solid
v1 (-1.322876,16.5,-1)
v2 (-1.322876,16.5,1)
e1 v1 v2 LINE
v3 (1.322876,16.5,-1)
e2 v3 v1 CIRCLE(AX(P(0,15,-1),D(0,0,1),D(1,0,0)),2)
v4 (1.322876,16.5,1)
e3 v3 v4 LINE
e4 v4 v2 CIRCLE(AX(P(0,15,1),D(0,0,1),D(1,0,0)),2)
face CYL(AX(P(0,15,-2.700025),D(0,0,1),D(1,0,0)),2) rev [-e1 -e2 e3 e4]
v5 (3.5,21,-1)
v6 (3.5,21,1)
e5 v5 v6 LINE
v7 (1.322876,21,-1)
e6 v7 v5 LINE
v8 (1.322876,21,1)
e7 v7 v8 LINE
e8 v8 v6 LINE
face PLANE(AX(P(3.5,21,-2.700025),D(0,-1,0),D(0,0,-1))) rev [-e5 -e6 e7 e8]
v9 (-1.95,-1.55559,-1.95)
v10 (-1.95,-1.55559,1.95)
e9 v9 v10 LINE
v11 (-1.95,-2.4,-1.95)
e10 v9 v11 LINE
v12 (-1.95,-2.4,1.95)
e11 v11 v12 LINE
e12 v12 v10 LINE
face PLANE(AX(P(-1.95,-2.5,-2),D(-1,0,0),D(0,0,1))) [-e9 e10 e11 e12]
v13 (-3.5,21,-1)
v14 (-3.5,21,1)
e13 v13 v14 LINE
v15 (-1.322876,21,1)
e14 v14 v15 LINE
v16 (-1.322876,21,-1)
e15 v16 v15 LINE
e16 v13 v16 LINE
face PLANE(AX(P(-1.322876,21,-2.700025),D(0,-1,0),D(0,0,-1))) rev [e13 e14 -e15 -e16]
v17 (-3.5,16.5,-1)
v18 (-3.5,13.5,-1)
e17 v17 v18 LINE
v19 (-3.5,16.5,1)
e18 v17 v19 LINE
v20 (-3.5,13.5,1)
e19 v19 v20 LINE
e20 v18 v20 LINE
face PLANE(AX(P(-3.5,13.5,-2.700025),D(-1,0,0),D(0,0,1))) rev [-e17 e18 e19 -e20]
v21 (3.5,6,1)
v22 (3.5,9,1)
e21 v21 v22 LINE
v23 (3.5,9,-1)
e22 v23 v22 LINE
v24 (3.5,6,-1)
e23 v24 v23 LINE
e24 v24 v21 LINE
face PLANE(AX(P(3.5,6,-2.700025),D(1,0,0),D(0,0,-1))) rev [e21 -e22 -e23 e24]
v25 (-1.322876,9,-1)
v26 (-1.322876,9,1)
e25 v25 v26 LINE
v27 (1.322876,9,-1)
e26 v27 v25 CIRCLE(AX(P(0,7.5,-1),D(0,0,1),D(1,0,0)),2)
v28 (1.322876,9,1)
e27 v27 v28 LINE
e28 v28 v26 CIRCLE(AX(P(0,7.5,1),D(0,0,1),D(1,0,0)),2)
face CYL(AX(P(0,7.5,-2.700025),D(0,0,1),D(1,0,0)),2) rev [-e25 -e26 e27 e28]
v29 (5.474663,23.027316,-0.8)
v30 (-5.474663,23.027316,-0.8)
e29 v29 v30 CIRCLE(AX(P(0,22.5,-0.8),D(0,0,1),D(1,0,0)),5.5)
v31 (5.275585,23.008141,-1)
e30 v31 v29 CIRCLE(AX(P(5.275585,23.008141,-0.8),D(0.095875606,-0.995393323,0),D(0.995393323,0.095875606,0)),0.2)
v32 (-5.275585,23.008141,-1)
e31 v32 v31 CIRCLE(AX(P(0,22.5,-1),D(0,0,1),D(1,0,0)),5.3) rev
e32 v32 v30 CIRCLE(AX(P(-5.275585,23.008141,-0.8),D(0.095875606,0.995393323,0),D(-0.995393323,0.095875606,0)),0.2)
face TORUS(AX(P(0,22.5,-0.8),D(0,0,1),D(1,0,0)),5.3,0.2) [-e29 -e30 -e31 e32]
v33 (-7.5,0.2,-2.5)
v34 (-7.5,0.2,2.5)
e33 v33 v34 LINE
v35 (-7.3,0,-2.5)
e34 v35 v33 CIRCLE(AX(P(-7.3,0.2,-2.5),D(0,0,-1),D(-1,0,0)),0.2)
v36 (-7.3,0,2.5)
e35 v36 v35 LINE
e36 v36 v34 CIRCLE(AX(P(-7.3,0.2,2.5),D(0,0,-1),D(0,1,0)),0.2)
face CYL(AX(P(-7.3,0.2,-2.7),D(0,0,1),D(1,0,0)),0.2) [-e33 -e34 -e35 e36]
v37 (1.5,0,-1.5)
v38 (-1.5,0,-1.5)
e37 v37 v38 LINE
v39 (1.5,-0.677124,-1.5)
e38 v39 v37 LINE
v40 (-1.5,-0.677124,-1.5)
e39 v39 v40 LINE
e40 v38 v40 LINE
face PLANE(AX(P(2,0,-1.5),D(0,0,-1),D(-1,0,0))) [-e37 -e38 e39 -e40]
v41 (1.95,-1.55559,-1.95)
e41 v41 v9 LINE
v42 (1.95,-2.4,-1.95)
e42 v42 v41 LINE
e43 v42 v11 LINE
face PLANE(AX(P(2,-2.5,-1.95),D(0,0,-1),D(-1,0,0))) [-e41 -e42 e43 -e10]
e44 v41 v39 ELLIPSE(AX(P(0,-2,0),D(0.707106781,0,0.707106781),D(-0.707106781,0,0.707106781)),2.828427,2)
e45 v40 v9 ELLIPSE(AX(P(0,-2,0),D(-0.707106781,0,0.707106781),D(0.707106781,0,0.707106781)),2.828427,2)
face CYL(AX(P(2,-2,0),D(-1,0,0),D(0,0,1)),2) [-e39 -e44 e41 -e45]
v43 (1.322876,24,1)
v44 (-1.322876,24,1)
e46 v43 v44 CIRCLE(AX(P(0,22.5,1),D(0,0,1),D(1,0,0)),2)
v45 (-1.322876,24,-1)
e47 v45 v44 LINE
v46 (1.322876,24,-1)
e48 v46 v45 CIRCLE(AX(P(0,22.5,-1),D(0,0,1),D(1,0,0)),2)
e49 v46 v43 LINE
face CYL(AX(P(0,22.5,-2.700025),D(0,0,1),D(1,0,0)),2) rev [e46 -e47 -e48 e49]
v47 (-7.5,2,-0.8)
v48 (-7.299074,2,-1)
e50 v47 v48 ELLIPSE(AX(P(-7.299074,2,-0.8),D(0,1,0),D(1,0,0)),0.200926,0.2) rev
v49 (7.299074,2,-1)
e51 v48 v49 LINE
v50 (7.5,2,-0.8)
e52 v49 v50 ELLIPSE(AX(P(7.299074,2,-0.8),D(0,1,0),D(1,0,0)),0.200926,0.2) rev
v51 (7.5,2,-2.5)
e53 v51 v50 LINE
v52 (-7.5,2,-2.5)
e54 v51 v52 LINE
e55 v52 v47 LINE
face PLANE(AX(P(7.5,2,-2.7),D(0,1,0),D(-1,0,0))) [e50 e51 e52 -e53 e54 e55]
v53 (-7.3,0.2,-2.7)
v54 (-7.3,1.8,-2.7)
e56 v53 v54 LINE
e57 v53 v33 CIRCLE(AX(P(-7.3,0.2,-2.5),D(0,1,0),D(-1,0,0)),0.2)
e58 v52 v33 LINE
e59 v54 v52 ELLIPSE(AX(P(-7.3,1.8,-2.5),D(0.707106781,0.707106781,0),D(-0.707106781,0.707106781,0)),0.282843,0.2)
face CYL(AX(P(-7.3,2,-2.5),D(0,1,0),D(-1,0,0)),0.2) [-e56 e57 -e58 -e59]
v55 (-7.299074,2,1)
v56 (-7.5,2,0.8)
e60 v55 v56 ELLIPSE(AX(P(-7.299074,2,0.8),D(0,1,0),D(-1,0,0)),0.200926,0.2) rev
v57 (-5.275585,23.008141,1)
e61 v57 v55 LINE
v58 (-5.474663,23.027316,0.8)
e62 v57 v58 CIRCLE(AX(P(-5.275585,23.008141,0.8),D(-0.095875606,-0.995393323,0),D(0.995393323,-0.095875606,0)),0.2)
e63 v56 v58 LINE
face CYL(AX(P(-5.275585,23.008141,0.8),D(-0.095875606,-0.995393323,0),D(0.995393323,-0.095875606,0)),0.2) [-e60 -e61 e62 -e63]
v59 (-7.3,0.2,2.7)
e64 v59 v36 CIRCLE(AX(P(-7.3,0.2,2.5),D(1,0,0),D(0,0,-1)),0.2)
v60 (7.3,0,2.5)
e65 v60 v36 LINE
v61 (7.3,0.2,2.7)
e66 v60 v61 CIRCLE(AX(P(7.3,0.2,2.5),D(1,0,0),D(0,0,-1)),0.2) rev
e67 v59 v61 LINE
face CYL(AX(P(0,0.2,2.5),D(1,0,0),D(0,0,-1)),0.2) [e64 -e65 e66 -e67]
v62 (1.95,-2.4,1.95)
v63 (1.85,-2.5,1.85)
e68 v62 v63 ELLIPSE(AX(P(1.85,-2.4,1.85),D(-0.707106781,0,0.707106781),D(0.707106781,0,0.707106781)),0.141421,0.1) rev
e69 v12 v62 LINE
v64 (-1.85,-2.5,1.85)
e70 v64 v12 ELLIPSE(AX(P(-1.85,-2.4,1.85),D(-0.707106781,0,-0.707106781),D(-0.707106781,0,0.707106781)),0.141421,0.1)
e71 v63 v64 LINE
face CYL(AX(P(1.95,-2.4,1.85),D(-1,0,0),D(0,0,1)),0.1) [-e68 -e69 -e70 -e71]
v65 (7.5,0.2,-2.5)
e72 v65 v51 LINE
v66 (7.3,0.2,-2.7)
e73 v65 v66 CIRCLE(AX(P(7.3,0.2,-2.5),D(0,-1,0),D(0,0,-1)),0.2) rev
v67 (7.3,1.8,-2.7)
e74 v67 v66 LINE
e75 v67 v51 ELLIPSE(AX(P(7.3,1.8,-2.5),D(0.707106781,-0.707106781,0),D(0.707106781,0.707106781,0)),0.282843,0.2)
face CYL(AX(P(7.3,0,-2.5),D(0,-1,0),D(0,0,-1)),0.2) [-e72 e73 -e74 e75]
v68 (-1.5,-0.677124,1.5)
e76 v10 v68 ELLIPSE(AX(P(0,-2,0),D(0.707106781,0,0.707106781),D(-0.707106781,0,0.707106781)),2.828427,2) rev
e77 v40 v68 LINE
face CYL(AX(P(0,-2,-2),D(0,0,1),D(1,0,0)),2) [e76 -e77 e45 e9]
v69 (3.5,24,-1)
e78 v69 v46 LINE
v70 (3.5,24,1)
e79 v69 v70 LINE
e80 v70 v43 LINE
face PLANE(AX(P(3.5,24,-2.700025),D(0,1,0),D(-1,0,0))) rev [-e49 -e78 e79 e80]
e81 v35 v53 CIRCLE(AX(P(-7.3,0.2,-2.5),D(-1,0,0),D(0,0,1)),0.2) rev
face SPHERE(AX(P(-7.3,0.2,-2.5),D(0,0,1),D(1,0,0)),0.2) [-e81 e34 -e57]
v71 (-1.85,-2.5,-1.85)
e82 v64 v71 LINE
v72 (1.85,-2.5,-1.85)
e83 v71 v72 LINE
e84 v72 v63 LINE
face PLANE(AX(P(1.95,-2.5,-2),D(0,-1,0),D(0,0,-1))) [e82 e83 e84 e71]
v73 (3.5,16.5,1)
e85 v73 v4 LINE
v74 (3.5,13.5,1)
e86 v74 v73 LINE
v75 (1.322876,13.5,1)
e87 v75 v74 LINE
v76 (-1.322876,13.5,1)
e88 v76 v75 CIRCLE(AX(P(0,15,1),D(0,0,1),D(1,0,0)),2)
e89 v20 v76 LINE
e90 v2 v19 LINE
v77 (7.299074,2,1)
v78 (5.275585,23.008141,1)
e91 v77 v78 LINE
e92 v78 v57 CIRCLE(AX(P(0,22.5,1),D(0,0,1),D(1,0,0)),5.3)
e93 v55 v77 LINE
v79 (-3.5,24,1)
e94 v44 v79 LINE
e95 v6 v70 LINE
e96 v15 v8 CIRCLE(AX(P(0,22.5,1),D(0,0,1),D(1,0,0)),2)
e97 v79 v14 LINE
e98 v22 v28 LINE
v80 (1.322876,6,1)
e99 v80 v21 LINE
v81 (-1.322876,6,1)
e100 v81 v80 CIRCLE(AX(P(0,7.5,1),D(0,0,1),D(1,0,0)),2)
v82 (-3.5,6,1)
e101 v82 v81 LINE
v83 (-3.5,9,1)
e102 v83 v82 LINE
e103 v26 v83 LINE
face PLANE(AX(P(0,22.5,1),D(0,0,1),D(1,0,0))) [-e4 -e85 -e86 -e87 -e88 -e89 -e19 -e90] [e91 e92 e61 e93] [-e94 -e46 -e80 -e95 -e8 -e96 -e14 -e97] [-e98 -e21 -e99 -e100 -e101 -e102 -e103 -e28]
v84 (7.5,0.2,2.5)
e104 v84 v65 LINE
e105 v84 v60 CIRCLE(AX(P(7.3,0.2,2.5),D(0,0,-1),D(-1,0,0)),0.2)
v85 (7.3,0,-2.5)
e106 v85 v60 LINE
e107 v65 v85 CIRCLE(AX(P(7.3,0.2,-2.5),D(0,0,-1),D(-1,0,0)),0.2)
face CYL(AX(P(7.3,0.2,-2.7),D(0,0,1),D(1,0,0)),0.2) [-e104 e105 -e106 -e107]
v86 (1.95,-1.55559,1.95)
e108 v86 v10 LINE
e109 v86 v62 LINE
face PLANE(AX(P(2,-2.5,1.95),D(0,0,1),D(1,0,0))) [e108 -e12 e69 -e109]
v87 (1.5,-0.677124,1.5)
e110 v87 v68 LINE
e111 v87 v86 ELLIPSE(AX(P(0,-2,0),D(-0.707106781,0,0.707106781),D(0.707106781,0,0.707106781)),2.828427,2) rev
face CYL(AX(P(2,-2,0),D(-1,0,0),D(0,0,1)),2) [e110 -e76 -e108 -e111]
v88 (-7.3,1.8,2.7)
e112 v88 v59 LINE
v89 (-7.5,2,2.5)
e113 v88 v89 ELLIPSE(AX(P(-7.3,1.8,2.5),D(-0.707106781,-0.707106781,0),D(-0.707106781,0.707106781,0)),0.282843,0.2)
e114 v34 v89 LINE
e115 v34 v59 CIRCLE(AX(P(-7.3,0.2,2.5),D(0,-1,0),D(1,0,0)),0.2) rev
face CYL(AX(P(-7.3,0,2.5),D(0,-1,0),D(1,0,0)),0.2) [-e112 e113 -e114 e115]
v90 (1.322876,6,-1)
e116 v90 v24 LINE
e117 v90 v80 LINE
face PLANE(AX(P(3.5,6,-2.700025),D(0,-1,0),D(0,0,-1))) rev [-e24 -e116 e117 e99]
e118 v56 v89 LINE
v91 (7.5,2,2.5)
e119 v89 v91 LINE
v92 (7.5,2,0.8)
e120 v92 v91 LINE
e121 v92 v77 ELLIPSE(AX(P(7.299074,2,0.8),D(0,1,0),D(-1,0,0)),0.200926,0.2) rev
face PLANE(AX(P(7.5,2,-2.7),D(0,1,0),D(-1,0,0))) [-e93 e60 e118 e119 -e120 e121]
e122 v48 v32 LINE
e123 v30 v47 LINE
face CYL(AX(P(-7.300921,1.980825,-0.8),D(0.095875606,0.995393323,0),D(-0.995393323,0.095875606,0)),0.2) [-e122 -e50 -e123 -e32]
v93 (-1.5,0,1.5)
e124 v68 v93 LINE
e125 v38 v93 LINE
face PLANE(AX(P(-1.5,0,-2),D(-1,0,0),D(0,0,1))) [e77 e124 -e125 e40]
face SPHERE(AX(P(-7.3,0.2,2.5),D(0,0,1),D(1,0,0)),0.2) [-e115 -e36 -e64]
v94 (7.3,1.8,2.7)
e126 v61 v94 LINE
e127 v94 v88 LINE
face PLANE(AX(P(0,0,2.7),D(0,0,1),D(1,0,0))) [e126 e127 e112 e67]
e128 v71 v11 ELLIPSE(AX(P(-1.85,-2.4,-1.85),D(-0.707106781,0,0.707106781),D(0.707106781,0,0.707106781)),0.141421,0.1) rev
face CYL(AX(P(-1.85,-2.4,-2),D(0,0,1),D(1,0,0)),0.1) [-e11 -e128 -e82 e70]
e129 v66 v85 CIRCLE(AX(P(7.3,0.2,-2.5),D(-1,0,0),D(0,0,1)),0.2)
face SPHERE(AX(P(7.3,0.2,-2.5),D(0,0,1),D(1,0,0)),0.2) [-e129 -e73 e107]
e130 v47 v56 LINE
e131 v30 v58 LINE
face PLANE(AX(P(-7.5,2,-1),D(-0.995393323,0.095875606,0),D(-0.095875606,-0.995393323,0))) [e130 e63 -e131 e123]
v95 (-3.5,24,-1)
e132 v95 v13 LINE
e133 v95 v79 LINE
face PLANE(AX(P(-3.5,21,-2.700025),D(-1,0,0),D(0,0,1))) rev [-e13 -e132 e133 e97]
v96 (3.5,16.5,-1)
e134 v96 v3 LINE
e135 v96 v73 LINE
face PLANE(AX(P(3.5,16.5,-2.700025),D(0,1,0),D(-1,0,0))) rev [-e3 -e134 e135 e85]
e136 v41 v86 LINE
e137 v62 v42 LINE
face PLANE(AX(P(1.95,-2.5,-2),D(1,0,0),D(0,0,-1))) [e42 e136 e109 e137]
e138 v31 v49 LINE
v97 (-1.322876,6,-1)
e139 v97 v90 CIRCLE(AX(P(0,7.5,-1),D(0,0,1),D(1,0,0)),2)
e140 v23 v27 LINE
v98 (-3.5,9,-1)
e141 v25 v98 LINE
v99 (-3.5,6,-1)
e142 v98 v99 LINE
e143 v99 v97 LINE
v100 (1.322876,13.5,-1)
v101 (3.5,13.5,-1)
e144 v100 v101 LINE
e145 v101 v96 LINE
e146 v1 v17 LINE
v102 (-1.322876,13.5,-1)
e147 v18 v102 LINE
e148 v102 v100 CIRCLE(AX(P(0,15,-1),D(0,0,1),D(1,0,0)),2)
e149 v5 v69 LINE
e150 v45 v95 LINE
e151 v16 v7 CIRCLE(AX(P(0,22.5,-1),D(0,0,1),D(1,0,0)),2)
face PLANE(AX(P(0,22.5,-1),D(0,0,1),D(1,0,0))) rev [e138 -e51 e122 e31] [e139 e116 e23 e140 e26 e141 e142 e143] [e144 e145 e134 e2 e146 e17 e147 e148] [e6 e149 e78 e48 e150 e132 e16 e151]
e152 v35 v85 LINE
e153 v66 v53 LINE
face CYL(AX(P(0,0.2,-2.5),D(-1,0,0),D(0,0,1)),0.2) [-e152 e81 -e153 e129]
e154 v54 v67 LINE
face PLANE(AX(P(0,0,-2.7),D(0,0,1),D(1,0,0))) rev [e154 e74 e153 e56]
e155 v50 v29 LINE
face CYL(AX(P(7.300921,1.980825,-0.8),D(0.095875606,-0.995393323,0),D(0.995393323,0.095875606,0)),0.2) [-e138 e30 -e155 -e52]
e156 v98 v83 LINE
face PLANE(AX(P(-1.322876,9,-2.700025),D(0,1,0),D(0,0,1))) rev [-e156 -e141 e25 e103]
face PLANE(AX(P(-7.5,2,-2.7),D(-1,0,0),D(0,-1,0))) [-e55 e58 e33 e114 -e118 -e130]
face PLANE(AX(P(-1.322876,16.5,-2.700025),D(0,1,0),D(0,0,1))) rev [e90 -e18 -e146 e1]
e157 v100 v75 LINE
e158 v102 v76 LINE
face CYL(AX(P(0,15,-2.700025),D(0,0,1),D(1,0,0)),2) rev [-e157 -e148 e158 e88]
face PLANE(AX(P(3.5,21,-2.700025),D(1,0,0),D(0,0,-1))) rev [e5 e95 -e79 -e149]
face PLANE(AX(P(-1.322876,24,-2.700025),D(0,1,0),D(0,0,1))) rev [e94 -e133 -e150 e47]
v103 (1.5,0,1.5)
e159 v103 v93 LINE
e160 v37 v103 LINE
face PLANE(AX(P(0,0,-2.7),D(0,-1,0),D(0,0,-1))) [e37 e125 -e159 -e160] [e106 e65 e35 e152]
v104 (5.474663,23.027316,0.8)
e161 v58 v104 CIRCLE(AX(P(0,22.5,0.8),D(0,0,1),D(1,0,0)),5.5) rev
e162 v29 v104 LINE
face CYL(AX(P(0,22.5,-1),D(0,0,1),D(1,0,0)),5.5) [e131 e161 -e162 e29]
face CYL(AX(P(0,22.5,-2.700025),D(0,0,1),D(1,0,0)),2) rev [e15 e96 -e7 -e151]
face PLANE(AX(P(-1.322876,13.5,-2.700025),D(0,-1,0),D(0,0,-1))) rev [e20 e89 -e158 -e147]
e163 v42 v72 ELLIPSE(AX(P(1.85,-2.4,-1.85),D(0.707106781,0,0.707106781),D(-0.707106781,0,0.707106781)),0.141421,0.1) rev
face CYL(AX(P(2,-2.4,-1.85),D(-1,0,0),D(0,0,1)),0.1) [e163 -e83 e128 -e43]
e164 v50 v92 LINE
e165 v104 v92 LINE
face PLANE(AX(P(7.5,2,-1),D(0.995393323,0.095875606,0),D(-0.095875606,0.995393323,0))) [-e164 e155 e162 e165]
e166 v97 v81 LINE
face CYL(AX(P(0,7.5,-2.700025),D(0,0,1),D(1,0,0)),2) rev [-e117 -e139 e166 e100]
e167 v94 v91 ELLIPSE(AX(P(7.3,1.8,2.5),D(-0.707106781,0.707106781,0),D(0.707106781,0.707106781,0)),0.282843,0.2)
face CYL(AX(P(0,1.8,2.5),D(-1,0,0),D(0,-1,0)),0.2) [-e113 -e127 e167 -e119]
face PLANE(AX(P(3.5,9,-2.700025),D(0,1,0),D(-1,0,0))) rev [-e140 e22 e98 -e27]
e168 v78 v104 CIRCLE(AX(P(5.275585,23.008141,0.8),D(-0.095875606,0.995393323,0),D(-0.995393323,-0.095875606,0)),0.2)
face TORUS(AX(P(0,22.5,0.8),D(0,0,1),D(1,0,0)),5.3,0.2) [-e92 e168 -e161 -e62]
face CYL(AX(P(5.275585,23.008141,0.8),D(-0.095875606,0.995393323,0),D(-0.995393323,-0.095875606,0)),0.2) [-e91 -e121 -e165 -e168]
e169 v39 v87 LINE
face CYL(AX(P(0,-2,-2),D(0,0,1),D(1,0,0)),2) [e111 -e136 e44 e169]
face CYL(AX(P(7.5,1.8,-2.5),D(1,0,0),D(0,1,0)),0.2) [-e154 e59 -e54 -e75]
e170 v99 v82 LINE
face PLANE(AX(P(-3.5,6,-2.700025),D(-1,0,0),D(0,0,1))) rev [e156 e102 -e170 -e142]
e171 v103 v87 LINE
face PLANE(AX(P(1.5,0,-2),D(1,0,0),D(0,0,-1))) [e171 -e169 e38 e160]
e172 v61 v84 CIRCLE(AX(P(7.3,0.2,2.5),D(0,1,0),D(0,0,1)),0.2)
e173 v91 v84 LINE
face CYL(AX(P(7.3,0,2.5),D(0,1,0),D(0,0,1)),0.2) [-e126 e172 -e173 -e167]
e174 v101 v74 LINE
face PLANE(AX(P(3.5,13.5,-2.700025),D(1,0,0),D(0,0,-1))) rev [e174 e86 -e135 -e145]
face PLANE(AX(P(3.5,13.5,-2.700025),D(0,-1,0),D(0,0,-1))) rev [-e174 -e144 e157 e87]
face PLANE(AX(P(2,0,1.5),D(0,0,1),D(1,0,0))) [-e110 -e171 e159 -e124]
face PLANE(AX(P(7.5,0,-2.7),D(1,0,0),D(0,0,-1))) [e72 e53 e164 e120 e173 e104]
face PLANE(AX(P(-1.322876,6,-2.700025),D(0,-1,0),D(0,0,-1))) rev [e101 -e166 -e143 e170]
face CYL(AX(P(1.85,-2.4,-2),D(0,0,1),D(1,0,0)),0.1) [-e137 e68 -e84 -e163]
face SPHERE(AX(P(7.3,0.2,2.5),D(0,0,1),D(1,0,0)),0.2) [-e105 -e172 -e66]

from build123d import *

# Parameters (mm, degrees)
EXTRUDE_1_DEPTH          = 2.7
EXTRUDE_1_DEPTH_BACK     = 2.7
EXTRUDE_2_DEPTH          = 1
EXTRUDE_2_DEPTH_BACK     = 1
CUT_EXTRUDE_1_DEPTH      = 30.222251796
PATTERN_LINEAR_1_COUNT   = 3
PATTERN_LINEAR_1_PITCH   = 7.5
EXTRUDE_3_DEPTH          = 2
EXTRUDE_3_DEPTH_BACK     = 2
CUT_EXTRUDE_2_DEPTH      = 2
CUT_EXTRUDE_2_DEPTH_BACK = 2
FILLET_1_R               = 0.1
FILLET_4_R               = 0.2
FILLET_5_R               = 0.2
FILLET_8_R               = 0.2


with BuildPart() as part:
    # 草图1 → 凸台-拉伸1 (new, two sides: drawn at the far end of the back side and taken through both)
    with BuildSketch(Plane.XY.offset(-EXTRUDE_1_DEPTH_BACK)):
        Polygon((0, 0), (7.5, 0), (7.5, 2), (-7.5, 2), (-7.5, 0), align=None)
    extrude(amount=EXTRUDE_1_DEPTH + EXTRUDE_1_DEPTH_BACK)

    # 草图2 → 凸台-拉伸2 (add, two sides: drawn at the far end of the back side and taken through both)
    with BuildSketch(Plane.XY.offset(-EXTRUDE_2_DEPTH_BACK)):
        with BuildLine():
            Line((-7.5, 2), (-5.474663278, 23.027315834))
            ThreePointArc((-5.474663278, 23.027315834), (0, 28), (5.474663278, 23.027315834))
            Line((5.474663278, 23.027315834), (7.5, 2))
            Line((7.5, 2), (-7.5, 2))
        make_face()
    extrude(amount=EXTRUDE_2_DEPTH + EXTRUDE_2_DEPTH_BACK)

    # 草图3 → 切除-拉伸1 (cut, through all)
    with BuildSketch(Plane.XY.offset(1)):
        with BuildLine():
            Line((3.5, 6), (3.5, 9))
            Line((3.5, 9), (1.322875656, 9))
            ThreePointArc((1.322875656, 9), (0, 9.5), (-1.322875656, 9))
            Line((-1.322875656, 9), (-3.5, 9))
            Line((-3.5, 9), (-3.5, 6))
            Line((-3.5, 6), (-1.322875656, 6))
            ThreePointArc((-1.322875656, 6), (0, 5.5), (1.322875656, 6))
            Line((1.322875656, 6), (3.5, 6))
        make_face()
    cut_extrude_1 = extrude(amount=-CUT_EXTRUDE_1_DEPTH, mode=Mode.SUBTRACT)

    # 阵列(线性)1: 切除-拉伸1 ×3
    with Locations(*[(0, i * PATTERN_LINEAR_1_PITCH, 0) for i in range(1, PATTERN_LINEAR_1_COUNT)]):
        add(cut_extrude_1, mode=Mode.SUBTRACT)

    # 草图4 → 凸台-拉伸3 (add, two sides: drawn at the far end of the back side and taken through both)
    with BuildSketch(Plane.XY.offset(-EXTRUDE_3_DEPTH_BACK)):
        with BuildLine():
            Line((1.5, 0), (-1.5, 0))
            Line((-1.5, 0), (-1.5, -0.677124344))
            ThreePointArc((-1.5, -0.677124344), (-1.780042303, -1.088161527), (-1.95, -1.555590279))
            Line((-1.95, -1.555590279), (-1.95, -2.5))
            Line((-1.95, -2.5), (1.95, -2.5))
            Line((1.95, -2.5), (1.95, -1.555590279))
            ThreePointArc((1.95, -1.555590279), (1.780042303, -1.088161527), (1.5, -0.677124344))
            Line((1.5, -0.677124344), (1.5, 0))
        make_face()
    extrude(amount=EXTRUDE_3_DEPTH + EXTRUDE_3_DEPTH_BACK)

    # 草图5 → 切除-拉伸2 (cut, two sides: drawn at the far end of the back side and taken through both)
    with BuildSketch(Plane(origin=(0, 0, 0), x_dir=(0, 0, -1), z_dir=(1, 0, 0)).offset(-CUT_EXTRUDE_2_DEPTH_BACK)):
        with BuildLine():
            Line((1.5, 0), (1.5, -0.677124344))
            ThreePointArc((1.5, -0.677124344), (1.780042303, -1.088161527), (1.95, -1.555590279))
            Line((1.95, -1.555590279), (1.95, -2.5))
            Line((1.95, -2.5), (2, -2.5))
            Line((2, -2.5), (2, 0))
            Line((2, 0), (1.5, 0))
        make_face()
        with BuildLine():
            Line((-2, 0), (-1.5, 0))
            Line((-1.5, 0), (-1.5, -0.677124344))
            ThreePointArc((-1.5, -0.677124344), (-1.780042303, -1.088161527), (-1.95, -1.555590279))
            Line((-1.95, -1.555590279), (-1.95, -2.5))
            Line((-1.95, -2.5), (-2, -2.5))
            Line((-2, -2.5), (-2, 0))
        make_face()
    extrude(amount=CUT_EXTRUDE_2_DEPTH + CUT_EXTRUDE_2_DEPTH_BACK, mode=Mode.SUBTRACT)

    # 圆角1
    fillet_1_edges = [part.edges().sort_by_distance(p)[0] for p in [
        (-1.95, -2.5, 0),
        (1.95, -2.5, 0),
        (0, -2.5, -1.95),
        (0, -2.5, 1.95),
    ]]
    fillet(fillet_1_edges, radius=FILLET_1_R)

    # 圆角4
    fillet_4_edges = [part.edges().sort_by_distance(p)[0] for p in [
        (-7.5, 1, 2.7),
        (0, 2, 2.7),
        (7.5, 1, 2.7),
        (0, 0, 2.7),
        (7.5, 1, -2.7),
        (0, 2, -2.7),
        (-7.5, 1, -2.7),
        (0, 0, -2.7),
    ]]
    fillet(fillet_4_edges, radius=FILLET_4_R)

    # 圆角5
    # the kernel refuses this fillet: 0.2 mm, written as the material it takes off along each edge
    with BuildSketch(Plane(origin=(7.3, 0.2, 2.5), x_dir=(1, 0, 0), z_dir=(0, -1, 0))) as fillet_5_piece_1_section:
        Polygon((0, 0), (FILLET_5_R, 0), (FILLET_5_R, FILLET_5_R), (0, FILLET_5_R), align=None)
    fillet_5_piece_1 = extrude(amount=FILLET_5_R, mode=Mode.PRIVATE)
    fillet_5_piece_1 = fillet_5_piece_1 - Plane(origin=(7.3, 0.2, 2.5), x_dir=(-0.7071067811865475, 0, -0.7071067811865475), z_dir=(0, -1, 0)) * Sphere(FILLET_5_R, mode=Mode.PRIVATE)
    add(fillet_5_piece_1, mode=Mode.SUBTRACT)
    with BuildSketch(Plane(origin=(-7.3, 0.2, 2.5), x_dir=(-1, 0, 0), z_dir=(0, -1, 0))) as fillet_5_piece_2_section:
        Polygon((0, 0), (FILLET_5_R, 0), (FILLET_5_R, -FILLET_5_R), (0, -FILLET_5_R), align=None)
    fillet_5_piece_2 = extrude(amount=FILLET_5_R, mode=Mode.PRIVATE)
    fillet_5_piece_2 = fillet_5_piece_2 - Plane(origin=(-7.3, 0.2, 2.5), x_dir=(0.7071067811865475, 1.2560739669470211e-15, -0.7071067811865475), z_dir=(0, -1, 0)) * Sphere(FILLET_5_R, mode=Mode.PRIVATE)
    add(fillet_5_piece_2, mode=Mode.SUBTRACT)
    with BuildSketch(Plane(origin=(-7.3, 0.2, -2.5), x_dir=(-1, 0, 0), z_dir=(0, -1, 0))) as fillet_5_piece_3_section:
        Polygon((0, 0), (FILLET_5_R, 0), (FILLET_5_R, FILLET_5_R), (0, FILLET_5_R), align=None)
    fillet_5_piece_3 = extrude(amount=FILLET_5_R, mode=Mode.PRIVATE)
    fillet_5_piece_3 = fillet_5_piece_3 - Plane(origin=(-7.3, 0.2, -2.5), x_dir=(0.7071067811865475, 1.2560739669470211e-15, 0.7071067811865475), z_dir=(0, -1, 0)) * Sphere(FILLET_5_R, mode=Mode.PRIVATE)
    add(fillet_5_piece_3, mode=Mode.SUBTRACT)
    with BuildSketch(Plane(origin=(7.3, 0.2, -2.5), x_dir=(1, 0, 0), z_dir=(0, -1, 0))) as fillet_5_piece_4_section:
        Polygon((0, 0), (FILLET_5_R, 0), (FILLET_5_R, -FILLET_5_R), (0, -FILLET_5_R), align=None)
    fillet_5_piece_4 = extrude(amount=FILLET_5_R, mode=Mode.PRIVATE)
    fillet_5_piece_4 = fillet_5_piece_4 - Plane(origin=(7.3, 0.2, -2.5), x_dir=(-0.7071067811865475, 0, 0.7071067811865475), z_dir=(0, -1, 0)) * Sphere(FILLET_5_R, mode=Mode.PRIVATE)
    add(fillet_5_piece_4, mode=Mode.SUBTRACT)
    with BuildSketch(Plane(origin=(-7.5, 0, 2.5), x_dir=(1, 0, 0), z_dir=(0, 0, -1)), Plane(origin=(7.5, 0, -2.5), x_dir=(-1, 0, 0), z_dir=(0, 0, 1))) as fillet_5_piece_5:
        with BuildLine():
            CenterArc((FILLET_5_R, -FILLET_5_R), FILLET_5_R, 90, 90)
            Line((0, -FILLET_5_R), (0, 0))
            Line((0, 0), (FILLET_5_R, 0))
        make_face()
    extrude(amount=5, mode=Mode.SUBTRACT)

    # 圆角8
    # the kernel refuses this fillet: 0.2 mm, written as the material it takes off along each edge
    with BuildSketch(Plane(origin=(-7.547937803, 1.502303338, 1), x_dir=(0, 0, -1), z_dir=(0.09587560610090687, 0.9953933233424785, 0))) as fillet_8_piece_1_section:
        with BuildLine():
            CenterArc((FILLET_8_R, -FILLET_8_R), FILLET_8_R, 90, 90)
            Line((0, -FILLET_8_R), (0, 0))
            Line((0, 0), (FILLET_8_R, 0))
        make_face()
    fillet_8_piece_1 = extrude(amount=21.624630174, mode=Mode.PRIVATE)
    fillet_8_piece_1 = split(fillet_8_piece_1, bisect_by=Plane(origin=(-6.442060612, 2, 0.954715968), z_dir=(0, 1, 0)), keep=Keep.TOP, mode=Mode.PRIVATE)
    add(fillet_8_piece_1, mode=Mode.SUBTRACT)
    with BuildSketch(Plane(origin=(5.474663278, 23.027315834, -1), x_dir=(0, 0, 1), z_dir=(0.09587560610090687, -0.9953933233424785, 0))) as fillet_8_piece_2_section:
        with BuildLine():
            CenterArc((FILLET_8_R, FILLET_8_R), FILLET_8_R, 180, 90)
            Line((0, FILLET_8_R), (0, 0))
            Line((0, 0), (FILLET_8_R, 0))
        make_face()
    fillet_8_piece_2 = extrude(amount=21.624630174, mode=Mode.PRIVATE)
    fillet_8_piece_2 = split(fillet_8_piece_2, bisect_by=Plane(origin=(6.442060612, 2, -0.954715968), z_dir=(0, 1, 0)), keep=Keep.TOP, mode=Mode.PRIVATE)
    add(fillet_8_piece_2, mode=Mode.SUBTRACT)
    with BuildSketch(Plane(origin=(0, 22.5, -1), x_dir=(-0.9953933233424784, 0.09587560610090734, 0), z_dir=(-0.09587560610090734, -0.9953933233424784, 0))) as fillet_8_piece_3:
        with BuildLine():
            CenterArc((5.5 - FILLET_8_R, -FILLET_8_R), FILLET_8_R, 0, 90)
            Line((5.5, -FILLET_8_R), (5.5, 0))
            Line((5.5, 0), (5.5 - FILLET_8_R, 0))
        make_face()
    revolve(axis=Axis((0, 22.5, -1), (0, 0, -1)), revolution_arc=168.996563204, mode=Mode.SUBTRACT)
    with BuildSketch(Plane(origin=(-7.547937803, 1.502303338, -1), x_dir=(0, 0, 1), z_dir=(0.09587560610090687, 0.9953933233424785, 0))) as fillet_8_piece_4_section:
        with BuildLine():
            CenterArc((FILLET_8_R, FILLET_8_R), FILLET_8_R, 180, 90)
            Line((0, FILLET_8_R), (0, 0))
            Line((0, 0), (FILLET_8_R, 0))
        make_face()
    fillet_8_piece_4 = extrude(amount=21.624630174, mode=Mode.PRIVATE)
    fillet_8_piece_4 = split(fillet_8_piece_4, bisect_by=Plane(origin=(-6.442060612, 2, -0.954715968), z_dir=(0, 1, 0)), keep=Keep.TOP, mode=Mode.PRIVATE)
    add(fillet_8_piece_4, mode=Mode.SUBTRACT)
    with BuildSketch(Plane(origin=(0, 22.5, 1), x_dir=(-0.9953933233424784, 0.09587560610090734, 0), z_dir=(-0.09587560610090734, -0.9953933233424784, 0))) as fillet_8_piece_5:
        with BuildLine():
            CenterArc((5.5 - FILLET_8_R, FILLET_8_R), FILLET_8_R, 270, 90)
            Line((5.5 - FILLET_8_R, 0), (5.5, 0))
            Line((5.5, 0), (5.5, FILLET_8_R))
        make_face()
    revolve(axis=Axis((0, 22.5, 1), (0, 0, -1)), revolution_arc=168.996563204, mode=Mode.SUBTRACT)
    with BuildSketch(Plane(origin=(5.474663278, 23.027315834, 1), x_dir=(0, 0, -1), z_dir=(0.09587560610090687, -0.9953933233424785, 0))) as fillet_8_piece_6_section:
        with BuildLine():
            CenterArc((FILLET_8_R, -FILLET_8_R), FILLET_8_R, 90, 90)
            Line((0, -FILLET_8_R), (0, 0))
            Line((0, 0), (FILLET_8_R, 0))
        make_face()
    fillet_8_piece_6 = extrude(amount=21.624630174, mode=Mode.PRIVATE)
    fillet_8_piece_6 = split(fillet_8_piece_6, bisect_by=Plane(origin=(6.442060612, 2, 0.954715968), z_dir=(0, 1, 0)), keep=Keep.TOP, mode=Mode.PRIVATE)
    add(fillet_8_piece_6, mode=Mode.SUBTRACT)


solid = part.part
